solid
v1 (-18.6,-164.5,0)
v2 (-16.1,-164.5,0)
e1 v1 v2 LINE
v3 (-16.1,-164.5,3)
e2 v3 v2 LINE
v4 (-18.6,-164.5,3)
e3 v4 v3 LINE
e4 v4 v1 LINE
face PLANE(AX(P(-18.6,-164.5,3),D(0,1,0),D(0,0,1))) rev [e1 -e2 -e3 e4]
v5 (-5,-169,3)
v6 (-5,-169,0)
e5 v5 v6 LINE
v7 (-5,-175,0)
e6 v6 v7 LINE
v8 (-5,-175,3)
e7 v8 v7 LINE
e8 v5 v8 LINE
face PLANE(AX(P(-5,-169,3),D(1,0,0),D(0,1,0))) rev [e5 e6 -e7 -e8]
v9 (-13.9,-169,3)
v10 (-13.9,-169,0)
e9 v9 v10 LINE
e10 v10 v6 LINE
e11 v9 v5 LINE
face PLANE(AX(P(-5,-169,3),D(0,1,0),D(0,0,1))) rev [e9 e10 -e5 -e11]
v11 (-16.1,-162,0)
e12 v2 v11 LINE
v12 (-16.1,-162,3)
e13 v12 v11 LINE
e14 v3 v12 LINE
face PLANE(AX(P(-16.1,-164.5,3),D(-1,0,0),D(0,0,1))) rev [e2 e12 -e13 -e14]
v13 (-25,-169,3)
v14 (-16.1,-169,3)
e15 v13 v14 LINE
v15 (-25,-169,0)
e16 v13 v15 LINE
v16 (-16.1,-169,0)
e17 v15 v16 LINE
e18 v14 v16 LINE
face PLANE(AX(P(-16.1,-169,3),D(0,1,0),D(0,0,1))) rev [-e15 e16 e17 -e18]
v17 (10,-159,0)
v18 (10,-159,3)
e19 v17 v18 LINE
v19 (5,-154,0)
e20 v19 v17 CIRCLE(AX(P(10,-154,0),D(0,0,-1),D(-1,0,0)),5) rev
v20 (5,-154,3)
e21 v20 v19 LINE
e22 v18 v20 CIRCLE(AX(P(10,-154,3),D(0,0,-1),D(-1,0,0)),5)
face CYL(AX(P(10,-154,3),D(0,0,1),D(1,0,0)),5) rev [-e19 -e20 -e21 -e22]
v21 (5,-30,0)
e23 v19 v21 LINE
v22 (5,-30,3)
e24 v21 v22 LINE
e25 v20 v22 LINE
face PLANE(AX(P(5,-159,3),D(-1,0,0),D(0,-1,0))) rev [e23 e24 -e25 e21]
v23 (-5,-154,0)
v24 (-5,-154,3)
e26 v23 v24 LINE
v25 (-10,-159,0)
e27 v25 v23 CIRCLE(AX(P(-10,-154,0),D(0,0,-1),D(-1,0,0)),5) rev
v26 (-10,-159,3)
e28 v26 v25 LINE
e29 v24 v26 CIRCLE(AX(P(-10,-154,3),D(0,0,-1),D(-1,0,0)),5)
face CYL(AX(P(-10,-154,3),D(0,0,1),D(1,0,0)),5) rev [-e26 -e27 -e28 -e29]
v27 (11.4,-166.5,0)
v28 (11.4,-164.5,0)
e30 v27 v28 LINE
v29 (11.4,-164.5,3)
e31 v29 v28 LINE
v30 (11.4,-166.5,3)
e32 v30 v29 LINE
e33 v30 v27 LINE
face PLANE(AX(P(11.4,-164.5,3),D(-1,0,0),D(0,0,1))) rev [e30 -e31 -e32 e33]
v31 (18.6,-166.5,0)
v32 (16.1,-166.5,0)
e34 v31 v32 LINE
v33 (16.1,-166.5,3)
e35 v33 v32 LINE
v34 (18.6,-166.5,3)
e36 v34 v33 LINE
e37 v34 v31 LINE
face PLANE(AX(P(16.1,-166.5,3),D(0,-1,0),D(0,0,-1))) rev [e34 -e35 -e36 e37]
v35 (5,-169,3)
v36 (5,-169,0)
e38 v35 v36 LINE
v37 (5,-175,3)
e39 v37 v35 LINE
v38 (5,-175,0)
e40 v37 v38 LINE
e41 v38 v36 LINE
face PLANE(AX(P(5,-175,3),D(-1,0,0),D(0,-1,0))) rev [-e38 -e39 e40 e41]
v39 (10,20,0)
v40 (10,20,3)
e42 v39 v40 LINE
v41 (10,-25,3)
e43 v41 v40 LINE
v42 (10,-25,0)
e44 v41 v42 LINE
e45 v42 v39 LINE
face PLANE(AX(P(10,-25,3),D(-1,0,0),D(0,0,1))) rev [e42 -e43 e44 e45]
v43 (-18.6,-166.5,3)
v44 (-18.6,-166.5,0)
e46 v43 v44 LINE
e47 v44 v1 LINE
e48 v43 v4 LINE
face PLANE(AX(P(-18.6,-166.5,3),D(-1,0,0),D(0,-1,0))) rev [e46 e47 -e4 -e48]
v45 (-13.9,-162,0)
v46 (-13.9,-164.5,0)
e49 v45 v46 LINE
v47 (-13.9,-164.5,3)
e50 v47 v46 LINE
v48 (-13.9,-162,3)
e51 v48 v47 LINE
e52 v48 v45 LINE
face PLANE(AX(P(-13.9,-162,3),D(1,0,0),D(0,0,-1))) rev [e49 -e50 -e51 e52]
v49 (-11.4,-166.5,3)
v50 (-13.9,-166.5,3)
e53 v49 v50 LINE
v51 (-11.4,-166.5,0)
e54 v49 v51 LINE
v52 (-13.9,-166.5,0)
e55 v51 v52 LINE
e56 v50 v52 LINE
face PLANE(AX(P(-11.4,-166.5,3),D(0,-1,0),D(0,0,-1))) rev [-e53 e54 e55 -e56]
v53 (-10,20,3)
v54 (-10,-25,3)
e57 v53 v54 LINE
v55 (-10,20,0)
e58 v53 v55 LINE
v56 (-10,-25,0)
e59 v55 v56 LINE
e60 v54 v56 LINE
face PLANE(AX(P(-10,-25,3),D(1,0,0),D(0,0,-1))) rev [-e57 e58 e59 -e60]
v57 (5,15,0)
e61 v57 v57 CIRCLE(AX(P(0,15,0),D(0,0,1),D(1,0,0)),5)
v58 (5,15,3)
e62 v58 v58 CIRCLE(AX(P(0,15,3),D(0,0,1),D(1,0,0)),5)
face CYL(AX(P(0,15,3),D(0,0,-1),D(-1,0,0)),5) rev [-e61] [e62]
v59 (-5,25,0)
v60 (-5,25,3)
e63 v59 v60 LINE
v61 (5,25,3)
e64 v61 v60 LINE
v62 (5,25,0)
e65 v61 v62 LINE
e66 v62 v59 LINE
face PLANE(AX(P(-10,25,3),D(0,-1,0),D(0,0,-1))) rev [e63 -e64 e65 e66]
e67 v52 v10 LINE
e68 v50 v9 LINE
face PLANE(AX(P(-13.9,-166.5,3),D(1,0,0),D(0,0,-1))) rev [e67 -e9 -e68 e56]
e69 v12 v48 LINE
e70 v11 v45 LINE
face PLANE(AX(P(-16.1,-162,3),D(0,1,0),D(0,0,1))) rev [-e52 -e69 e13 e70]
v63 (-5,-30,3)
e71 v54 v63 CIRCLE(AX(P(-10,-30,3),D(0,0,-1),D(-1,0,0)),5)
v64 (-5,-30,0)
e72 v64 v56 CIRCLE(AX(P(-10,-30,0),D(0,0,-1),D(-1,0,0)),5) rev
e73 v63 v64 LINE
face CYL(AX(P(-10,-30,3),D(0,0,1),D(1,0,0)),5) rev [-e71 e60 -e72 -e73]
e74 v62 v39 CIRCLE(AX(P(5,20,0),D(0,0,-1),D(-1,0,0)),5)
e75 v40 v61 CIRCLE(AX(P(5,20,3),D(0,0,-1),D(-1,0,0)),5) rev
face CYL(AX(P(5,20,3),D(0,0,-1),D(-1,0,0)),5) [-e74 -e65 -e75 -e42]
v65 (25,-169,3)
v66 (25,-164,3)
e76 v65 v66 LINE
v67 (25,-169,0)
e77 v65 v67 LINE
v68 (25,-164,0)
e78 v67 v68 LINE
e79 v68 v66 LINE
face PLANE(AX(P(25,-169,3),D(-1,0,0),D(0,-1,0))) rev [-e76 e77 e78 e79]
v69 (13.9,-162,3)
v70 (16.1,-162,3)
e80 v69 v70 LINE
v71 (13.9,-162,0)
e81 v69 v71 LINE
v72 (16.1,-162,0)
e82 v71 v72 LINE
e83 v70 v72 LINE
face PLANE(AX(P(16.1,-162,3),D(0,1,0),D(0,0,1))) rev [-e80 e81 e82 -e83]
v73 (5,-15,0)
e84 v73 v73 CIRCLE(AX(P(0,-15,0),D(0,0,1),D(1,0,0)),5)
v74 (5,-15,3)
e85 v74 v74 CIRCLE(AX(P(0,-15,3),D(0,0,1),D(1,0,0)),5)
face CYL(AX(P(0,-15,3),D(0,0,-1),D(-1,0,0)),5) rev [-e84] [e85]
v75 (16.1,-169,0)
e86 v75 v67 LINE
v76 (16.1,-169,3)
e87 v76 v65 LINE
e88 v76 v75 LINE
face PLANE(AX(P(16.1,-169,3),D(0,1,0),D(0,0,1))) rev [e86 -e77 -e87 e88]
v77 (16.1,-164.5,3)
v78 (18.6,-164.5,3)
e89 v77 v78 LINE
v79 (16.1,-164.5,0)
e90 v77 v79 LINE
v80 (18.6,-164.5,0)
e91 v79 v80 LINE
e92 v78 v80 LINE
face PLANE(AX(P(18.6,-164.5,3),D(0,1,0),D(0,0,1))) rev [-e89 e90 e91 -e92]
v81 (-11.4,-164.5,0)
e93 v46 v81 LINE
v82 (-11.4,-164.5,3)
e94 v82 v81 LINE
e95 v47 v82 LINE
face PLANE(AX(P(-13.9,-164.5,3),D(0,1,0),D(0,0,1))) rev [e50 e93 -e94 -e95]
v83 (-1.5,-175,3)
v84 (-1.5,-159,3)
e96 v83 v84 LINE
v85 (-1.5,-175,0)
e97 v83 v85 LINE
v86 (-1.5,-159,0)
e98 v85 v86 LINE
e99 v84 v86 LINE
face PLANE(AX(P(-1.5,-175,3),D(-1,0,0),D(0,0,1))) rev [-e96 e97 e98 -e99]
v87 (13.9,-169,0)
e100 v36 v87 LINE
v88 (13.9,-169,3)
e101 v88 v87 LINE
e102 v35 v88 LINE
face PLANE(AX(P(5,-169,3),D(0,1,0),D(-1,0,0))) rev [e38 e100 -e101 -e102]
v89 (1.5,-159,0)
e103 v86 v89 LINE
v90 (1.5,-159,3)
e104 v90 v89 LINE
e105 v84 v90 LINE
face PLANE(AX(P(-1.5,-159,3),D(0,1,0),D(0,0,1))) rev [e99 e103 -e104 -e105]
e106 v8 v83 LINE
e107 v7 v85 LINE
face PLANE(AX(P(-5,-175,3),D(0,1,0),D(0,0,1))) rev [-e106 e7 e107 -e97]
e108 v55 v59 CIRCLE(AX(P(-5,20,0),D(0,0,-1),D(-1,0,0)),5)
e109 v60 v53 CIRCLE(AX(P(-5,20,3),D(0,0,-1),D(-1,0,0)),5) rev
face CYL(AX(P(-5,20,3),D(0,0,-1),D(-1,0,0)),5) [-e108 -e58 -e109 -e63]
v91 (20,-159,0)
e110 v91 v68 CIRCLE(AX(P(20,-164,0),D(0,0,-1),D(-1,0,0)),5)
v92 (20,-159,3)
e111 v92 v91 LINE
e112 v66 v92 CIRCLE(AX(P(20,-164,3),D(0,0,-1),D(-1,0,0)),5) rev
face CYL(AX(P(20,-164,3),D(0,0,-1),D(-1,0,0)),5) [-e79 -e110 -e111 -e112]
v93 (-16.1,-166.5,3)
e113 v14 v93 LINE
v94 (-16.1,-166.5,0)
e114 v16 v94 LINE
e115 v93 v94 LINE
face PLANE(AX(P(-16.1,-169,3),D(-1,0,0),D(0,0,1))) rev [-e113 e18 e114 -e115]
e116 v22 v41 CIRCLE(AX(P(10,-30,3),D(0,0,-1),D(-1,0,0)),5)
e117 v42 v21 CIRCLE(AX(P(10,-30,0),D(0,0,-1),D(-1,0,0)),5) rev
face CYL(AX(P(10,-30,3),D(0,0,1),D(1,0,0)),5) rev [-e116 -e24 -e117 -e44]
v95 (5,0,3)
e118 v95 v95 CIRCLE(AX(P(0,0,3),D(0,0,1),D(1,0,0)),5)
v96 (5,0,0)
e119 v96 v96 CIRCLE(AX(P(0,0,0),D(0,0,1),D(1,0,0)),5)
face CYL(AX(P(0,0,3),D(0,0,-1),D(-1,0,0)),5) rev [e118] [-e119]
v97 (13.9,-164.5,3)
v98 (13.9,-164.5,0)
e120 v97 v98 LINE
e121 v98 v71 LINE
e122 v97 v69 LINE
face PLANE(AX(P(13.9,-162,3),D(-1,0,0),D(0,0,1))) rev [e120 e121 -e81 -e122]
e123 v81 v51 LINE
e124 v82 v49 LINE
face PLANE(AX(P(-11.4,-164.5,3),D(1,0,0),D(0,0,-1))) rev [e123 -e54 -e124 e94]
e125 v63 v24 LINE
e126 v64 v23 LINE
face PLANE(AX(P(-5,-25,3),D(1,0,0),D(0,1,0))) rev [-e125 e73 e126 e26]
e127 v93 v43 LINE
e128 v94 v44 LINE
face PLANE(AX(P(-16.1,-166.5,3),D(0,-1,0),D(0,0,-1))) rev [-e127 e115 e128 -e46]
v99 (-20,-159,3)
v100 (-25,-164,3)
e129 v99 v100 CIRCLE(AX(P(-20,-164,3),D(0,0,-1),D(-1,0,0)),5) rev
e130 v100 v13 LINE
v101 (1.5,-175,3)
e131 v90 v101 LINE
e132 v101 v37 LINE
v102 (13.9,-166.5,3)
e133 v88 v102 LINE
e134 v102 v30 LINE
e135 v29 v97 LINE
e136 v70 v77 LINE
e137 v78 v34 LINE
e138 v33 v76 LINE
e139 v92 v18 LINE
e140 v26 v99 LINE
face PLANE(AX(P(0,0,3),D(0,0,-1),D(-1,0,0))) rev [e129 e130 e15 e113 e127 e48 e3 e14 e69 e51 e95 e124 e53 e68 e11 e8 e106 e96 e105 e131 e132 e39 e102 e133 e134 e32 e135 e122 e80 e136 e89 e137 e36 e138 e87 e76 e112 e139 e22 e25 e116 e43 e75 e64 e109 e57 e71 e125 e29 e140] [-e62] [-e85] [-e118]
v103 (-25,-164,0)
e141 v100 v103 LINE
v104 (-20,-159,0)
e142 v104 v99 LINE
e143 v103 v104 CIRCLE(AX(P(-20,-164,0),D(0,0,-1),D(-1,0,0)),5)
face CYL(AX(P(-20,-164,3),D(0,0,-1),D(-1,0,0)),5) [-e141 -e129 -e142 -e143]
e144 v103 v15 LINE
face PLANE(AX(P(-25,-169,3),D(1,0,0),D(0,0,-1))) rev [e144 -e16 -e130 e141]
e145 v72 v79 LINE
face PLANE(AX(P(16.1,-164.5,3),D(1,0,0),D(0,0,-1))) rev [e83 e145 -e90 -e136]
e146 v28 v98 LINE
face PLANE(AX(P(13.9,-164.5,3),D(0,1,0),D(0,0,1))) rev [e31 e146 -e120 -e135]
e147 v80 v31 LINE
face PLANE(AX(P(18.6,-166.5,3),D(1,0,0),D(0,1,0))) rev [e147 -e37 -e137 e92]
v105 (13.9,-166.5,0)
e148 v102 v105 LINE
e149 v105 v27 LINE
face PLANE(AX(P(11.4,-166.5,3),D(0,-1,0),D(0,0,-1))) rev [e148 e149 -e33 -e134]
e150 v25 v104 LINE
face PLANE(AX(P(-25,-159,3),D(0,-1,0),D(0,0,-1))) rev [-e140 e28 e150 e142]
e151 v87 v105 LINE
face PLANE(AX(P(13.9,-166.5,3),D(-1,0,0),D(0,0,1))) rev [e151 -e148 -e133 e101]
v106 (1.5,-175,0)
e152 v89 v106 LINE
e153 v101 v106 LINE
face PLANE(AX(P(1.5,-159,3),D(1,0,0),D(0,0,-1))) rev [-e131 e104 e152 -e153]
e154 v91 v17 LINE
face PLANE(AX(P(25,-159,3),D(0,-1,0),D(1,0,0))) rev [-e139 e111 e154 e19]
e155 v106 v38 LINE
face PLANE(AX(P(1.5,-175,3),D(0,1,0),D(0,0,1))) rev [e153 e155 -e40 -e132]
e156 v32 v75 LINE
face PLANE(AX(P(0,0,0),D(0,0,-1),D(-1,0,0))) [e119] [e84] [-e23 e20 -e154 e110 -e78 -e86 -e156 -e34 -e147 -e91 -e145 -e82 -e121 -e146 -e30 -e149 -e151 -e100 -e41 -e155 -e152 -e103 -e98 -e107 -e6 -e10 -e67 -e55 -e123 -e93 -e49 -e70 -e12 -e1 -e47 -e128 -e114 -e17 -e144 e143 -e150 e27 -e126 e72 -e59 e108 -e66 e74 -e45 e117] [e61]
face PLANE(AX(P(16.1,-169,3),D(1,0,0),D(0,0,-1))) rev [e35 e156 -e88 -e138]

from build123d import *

# Parameters (mm, degrees)
SKETCH1_R           = 5
BOSS_EXTRUDE1_DEPTH = 3
FILLET1_START       = -1
FILLET1_DEPTH       = 5
FILLET1_2_DEPTH     = 3


with BuildPart() as part:
    # Sketch1 → Boss-Extrude1 (new body)
    with BuildSketch(Plane.XY):
        Polygon((-5, -25), (-5, -159), (-25, -159), (-25, -169), (-16.1, -169), (-16.1, -166.5), (-18.6, -166.5), (-18.6, -164.5), (-16.1, -164.5), (-16.1, -162), (-13.9, -162), (-13.9, -164.5), (-11.4, -164.5), (-11.4, -166.5), (-13.9, -166.5), (-13.9, -169), (-5, -169), (-5, -175), (-1.5, -175), (-1.5, -159), (1.5, -159), (1.5, -175), (5, -175), (5, -169), (13.9, -169), (13.9, -166.5), (11.4, -166.5), (11.4, -164.5), (13.9, -164.5), (13.9, -162), (16.1, -162), (16.1, -164.5), (18.6, -164.5), (18.6, -166.5), (16.1, -166.5), (16.1, -169), (25, -169), (25, -159), (5, -159), (5, -25), (10, -25), (10, 25), (-10, 25), (-10, -25), align=None)
        with Locations((0, 15)):
            Circle(SKETCH1_R, mode=Mode.SUBTRACT)
        Circle(SKETCH1_R, mode=Mode.SUBTRACT)
        with Locations((0, -15)):
            Circle(SKETCH1_R, mode=Mode.SUBTRACT)
    extrude(amount=BOSS_EXTRUDE1_DEPTH)

    # Fillet1: read off the stored shape, not the designer's step
    # Fillet1 outline → Fillet1 (cut)
    with BuildSketch(Plane.XY.offset(FILLET1_START)):
        with BuildLine():
            Line((25, -159), (20, -159))
            ThreePointArc((20, -159), (23.535533906, -160.464466094), (25, -164))
            Line((25, -164), (25, -159))
        make_face()
        with BuildLine():
            ThreePointArc((-25, -164), (-23.535533906, -160.464466094), (-20, -159))
            Line((-20, -159), (-25, -159))
            Line((-25, -159), (-25, -164))
        make_face()
        with BuildLine():
            ThreePointArc((-10, 20), (-8.535533906, 23.535533906), (-5, 25))
            Line((-5, 25), (-10, 25))
            Line((-10, 25), (-10, 20))
        make_face()
        with BuildLine():
            ThreePointArc((5, 25), (8.535533906, 23.535533906), (10, 20))
            Line((10, 20), (10, 25))
            Line((10, 25), (5, 25))
        make_face()
    extrude(amount=FILLET1_DEPTH, mode=Mode.SUBTRACT)

    # Fillet1 2 outline → Fillet1 2 (add)
    with BuildSketch(Plane.XY):
        with BuildLine():
            Line((-5, -159), (-5, -154))
            ThreePointArc((-5, -154), (-6.464466094, -157.535533906), (-10, -159))
            Line((-10, -159), (-5, -159))
        make_face()
        with BuildLine():
            Line((-5, -25), (-10, -25))
            ThreePointArc((-10, -25), (-6.464466094, -26.464466094), (-5, -30))
            Line((-5, -30), (-5, -25))
        make_face()
        with BuildLine():
            Line((5, -25), (5, -30))
            ThreePointArc((5, -30), (6.464466094, -26.464466094), (10, -25))
            Line((10, -25), (5, -25))
        make_face()
        with BuildLine():
            Line((5, -159), (10, -159))
            ThreePointArc((10, -159), (6.464466094, -157.535533906), (5, -154))
            Line((5, -154), (5, -159))
        make_face()
    extrude(amount=FILLET1_2_DEPTH)


solid = part.part
